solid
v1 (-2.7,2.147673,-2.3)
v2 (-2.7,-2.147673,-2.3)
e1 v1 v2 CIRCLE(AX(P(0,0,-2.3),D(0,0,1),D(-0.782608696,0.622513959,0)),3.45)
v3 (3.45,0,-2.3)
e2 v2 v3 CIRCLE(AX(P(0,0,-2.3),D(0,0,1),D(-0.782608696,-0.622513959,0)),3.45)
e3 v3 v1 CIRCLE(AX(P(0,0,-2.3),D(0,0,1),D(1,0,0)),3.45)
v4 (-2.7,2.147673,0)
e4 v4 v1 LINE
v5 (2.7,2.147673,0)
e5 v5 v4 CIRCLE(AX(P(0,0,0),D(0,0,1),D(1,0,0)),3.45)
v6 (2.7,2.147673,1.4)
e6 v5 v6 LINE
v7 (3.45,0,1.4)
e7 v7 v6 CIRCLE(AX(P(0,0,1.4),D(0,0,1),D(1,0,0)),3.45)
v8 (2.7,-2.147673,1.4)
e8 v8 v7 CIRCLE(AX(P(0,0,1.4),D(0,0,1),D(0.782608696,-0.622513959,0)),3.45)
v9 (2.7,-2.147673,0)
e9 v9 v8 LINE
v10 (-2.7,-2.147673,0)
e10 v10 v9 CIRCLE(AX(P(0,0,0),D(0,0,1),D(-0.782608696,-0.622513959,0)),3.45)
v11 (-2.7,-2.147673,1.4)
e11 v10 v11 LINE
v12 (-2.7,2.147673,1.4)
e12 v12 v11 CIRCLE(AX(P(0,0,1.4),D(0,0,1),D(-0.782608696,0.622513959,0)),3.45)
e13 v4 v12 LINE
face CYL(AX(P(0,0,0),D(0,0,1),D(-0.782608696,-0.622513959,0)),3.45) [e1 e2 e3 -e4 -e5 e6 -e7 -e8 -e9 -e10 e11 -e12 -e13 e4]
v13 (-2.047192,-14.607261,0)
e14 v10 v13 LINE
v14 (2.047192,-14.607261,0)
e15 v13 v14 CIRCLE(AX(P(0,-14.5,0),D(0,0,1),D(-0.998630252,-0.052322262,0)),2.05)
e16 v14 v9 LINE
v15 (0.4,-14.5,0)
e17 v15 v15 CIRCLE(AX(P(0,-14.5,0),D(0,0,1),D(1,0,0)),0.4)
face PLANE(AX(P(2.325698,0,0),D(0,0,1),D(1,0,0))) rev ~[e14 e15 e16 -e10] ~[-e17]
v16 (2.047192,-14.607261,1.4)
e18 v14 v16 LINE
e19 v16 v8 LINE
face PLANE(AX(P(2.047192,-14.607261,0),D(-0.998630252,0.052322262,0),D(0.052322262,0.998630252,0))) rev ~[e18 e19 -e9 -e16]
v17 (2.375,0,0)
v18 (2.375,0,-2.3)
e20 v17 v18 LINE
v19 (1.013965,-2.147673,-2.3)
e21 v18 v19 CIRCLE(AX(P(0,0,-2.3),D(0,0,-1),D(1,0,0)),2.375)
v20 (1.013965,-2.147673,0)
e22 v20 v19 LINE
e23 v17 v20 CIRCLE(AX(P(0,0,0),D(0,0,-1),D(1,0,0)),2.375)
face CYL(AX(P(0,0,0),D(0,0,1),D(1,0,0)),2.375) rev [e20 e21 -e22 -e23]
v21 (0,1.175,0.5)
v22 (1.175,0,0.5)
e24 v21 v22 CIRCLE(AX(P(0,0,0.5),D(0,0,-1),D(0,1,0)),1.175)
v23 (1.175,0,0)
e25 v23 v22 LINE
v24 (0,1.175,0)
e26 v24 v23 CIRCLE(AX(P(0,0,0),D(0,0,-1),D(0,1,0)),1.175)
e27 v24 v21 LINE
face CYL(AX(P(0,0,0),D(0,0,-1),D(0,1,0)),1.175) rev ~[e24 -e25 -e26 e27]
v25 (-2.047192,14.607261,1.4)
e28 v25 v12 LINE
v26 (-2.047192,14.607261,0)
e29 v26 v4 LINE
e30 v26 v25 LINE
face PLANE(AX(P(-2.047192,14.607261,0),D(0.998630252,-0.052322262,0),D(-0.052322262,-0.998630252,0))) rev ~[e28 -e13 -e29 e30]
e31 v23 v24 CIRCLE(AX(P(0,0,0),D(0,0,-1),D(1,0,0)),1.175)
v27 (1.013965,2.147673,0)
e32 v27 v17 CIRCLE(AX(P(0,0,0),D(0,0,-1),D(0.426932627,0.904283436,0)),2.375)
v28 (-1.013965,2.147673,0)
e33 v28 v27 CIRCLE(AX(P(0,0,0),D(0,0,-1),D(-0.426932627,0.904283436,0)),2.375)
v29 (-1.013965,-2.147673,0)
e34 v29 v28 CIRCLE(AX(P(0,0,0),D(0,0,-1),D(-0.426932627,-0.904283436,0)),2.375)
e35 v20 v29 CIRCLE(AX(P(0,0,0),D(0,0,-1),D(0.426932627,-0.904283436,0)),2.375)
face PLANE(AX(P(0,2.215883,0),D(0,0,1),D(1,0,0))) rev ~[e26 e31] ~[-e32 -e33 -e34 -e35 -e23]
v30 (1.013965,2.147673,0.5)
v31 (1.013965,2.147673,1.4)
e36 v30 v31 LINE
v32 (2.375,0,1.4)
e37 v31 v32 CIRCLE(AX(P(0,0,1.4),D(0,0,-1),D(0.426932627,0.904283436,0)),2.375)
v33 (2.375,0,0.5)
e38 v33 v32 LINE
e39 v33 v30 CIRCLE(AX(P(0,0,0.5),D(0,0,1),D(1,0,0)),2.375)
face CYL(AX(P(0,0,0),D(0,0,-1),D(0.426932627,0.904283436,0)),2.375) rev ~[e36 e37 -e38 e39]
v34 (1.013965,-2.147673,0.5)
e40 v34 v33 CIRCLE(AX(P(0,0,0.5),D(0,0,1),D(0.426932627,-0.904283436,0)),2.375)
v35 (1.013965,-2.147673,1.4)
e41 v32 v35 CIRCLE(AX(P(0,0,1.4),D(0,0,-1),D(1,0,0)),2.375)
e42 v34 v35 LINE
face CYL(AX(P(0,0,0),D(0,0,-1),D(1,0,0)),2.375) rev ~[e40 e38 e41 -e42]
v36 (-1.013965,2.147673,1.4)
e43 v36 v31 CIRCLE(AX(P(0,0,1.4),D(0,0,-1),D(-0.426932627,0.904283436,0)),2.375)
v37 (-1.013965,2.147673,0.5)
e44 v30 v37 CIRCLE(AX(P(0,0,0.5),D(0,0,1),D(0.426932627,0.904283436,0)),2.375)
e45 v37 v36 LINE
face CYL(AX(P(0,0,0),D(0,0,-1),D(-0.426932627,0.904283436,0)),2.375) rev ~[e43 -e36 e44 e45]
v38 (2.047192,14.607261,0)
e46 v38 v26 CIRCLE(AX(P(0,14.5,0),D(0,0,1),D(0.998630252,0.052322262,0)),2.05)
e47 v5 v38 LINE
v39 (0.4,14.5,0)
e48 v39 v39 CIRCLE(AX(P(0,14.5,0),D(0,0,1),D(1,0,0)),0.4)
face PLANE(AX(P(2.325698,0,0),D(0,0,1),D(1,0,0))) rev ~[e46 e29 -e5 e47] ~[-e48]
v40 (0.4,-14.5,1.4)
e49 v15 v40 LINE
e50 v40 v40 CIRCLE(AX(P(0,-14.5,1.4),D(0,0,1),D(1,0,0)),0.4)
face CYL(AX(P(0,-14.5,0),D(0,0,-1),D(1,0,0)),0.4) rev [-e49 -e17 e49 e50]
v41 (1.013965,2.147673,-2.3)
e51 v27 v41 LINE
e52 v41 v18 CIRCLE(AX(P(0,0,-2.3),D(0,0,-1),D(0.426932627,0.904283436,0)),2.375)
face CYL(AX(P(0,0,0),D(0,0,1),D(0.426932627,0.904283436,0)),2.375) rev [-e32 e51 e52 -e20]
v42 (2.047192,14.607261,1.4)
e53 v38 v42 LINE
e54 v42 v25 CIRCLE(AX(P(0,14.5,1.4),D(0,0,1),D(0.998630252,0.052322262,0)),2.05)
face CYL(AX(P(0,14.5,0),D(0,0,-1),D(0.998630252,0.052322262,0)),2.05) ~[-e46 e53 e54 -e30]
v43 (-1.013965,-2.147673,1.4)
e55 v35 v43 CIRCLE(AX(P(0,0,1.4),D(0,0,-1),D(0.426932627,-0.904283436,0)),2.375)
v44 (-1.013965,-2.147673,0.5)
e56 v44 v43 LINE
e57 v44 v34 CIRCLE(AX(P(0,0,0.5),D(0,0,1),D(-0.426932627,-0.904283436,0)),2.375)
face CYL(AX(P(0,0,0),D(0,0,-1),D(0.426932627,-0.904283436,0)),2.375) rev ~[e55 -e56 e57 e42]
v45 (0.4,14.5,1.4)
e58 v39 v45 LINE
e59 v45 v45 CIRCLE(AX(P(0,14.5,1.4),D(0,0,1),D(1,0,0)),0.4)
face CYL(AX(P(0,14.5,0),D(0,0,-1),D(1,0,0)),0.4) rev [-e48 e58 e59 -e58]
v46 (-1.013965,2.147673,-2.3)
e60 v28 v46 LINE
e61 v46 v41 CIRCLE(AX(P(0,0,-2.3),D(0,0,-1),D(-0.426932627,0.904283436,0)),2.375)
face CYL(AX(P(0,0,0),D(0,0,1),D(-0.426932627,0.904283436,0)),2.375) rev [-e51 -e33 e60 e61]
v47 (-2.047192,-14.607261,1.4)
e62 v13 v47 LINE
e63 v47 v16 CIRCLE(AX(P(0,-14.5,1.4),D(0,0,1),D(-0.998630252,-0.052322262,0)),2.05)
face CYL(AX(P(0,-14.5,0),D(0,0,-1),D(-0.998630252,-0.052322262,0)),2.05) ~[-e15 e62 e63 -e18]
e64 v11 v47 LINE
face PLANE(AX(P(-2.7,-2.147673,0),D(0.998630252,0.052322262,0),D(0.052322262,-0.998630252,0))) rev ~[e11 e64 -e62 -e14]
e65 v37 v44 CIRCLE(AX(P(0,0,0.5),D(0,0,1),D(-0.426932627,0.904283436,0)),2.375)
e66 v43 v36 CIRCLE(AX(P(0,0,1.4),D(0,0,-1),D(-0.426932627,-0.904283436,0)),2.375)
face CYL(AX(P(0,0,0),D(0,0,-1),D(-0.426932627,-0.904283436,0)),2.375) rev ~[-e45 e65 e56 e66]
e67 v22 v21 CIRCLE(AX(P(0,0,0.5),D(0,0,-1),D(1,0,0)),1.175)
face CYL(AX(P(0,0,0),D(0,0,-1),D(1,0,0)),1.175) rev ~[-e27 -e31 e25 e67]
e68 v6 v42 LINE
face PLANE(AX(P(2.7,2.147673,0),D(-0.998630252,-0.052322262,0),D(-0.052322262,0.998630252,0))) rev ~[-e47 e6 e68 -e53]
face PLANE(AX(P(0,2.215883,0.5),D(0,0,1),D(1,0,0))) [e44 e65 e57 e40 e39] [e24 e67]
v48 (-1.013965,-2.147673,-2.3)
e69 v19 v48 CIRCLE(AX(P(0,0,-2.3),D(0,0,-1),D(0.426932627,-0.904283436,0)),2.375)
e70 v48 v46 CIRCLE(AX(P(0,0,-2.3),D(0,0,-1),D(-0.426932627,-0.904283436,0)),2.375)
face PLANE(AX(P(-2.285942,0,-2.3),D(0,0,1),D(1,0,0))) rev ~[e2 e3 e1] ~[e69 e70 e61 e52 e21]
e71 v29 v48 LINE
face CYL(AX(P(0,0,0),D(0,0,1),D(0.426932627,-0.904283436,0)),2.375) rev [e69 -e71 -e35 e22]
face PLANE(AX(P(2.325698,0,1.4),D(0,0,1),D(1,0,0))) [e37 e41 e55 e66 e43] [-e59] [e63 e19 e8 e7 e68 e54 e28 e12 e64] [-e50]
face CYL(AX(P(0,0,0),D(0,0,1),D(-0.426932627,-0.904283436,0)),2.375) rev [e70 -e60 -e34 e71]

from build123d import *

# Parameters (mm, degrees)
F0_R     = 0.4
F1_DEPTH = 1.4
F2_DEPTH = 2.3
F3_DEPTH = 0.5


with BuildPart() as f1:
    # F0 (on Top) → F1 (new body)
    with BuildSketch(Plane.XY):
        with BuildLine():
            ThreePointArc((2.7, -2.1476731595), (3.2571076126, -1.1374313166), (3.45, 0))
            ThreePointArc((3.45, 0), (3.2571076126, 1.1374313166), (2.7, 2.1476731595))
            Line((2.7, 2.1476731595), (1.0139649895, 2.1476731595))
            ThreePointArc((1.0139649895, 2.1476731595), (2.0060897101, 1.2713099838), (2.375, 0))
            ThreePointArc((2.375, 0), (2.0060897101, -1.2713099838), (1.0139649895, -2.1476731595))
            Line((1.0139649895, -2.1476731595), (2.7, -2.1476731595))
        make_face()
        with BuildLine():
            Line((1.0139649895, 2.1476731595), (2.7, 2.1476731595))
            ThreePointArc((2.7, 2.1476731595), (0, 3.45), (-2.7, 2.1476731595))
            Line((-2.7, 2.1476731595), (-1.0139649895, 2.1476731595))
            ThreePointArc((-1.0139649895, 2.1476731595), (0, 2.375), (1.0139649895, 2.1476731595))
        make_face()
        with BuildLine():
            ThreePointArc((-2.7, 2.1476731595), (0, 3.45), (2.7, 2.1476731595))
            Line((2.7, 2.1476731595), (2.0471920173, 14.6072606371))
            ThreePointArc((2.0471920173, 14.6072606371), (2.0492978841, 14.553648693), (2.05, 14.5))
            ThreePointArc((2.05, 14.5), (-0.053648693, 12.4507021159), (-2.0471920173, 14.6072606371))
            Line((-2.0471920173, 14.6072606371), (-2.7, 2.1476731595))
        make_face()
        with BuildLine():
            Line((2.0471920173, -14.6072606371), (2.7, -2.1476731595))
            ThreePointArc((2.7, -2.1476731595), (0, -3.45), (-2.7, -2.1476731595))
            Line((-2.7, -2.1476731595), (-2.0471920173, -14.6072606371))
            ThreePointArc((-2.0471920173, -14.6072606371), (-0.053648693, -12.4507021159), (2.05, -14.5))
            ThreePointArc((2.05, -14.5), (2.0492978841, -14.553648693), (2.0471920173, -14.6072606371))
        make_face()
        with BuildLine():
            ThreePointArc((-2.7, -2.1476731595), (0, -3.45), (2.7, -2.1476731595))
            Line((2.7, -2.1476731595), (1.0139649895, -2.1476731595))
            ThreePointArc((1.0139649895, -2.1476731595), (0, -2.375), (-1.0139649895, -2.1476731595))
            Line((-1.0139649895, -2.1476731595), (-2.7, -2.1476731595))
        make_face()
        with BuildLine():
            Line((-1.0139649895, 2.1476731595), (-2.7, 2.1476731595))
            ThreePointArc((-2.7, 2.1476731595), (-3.45, 0), (-2.7, -2.1476731595))
            Line((-2.7, -2.1476731595), (-1.0139649895, -2.1476731595))
            ThreePointArc((-1.0139649895, -2.1476731595), (-2.375, 0), (-1.0139649895, 2.1476731595))
        make_face()
        with BuildLine():
            ThreePointArc((2.05, 14.5), (2.0492978841, 14.553648693), (2.0471920173, 14.6072606371))
            ThreePointArc((2.0471920173, 14.6072606371), (0, 16.55), (-2.0471920173, 14.6072606371))
            ThreePointArc((-2.0471920173, 14.6072606371), (-0.053648693, 12.4507021159), (2.05, 14.5))
        make_face()
        with Locations((0, 14.5)):
            Circle(F0_R, mode=Mode.SUBTRACT)
        with BuildLine():
            ThreePointArc((-2.0471920173, -14.6072606371), (0, -16.55), (2.0471920173, -14.6072606371))
            ThreePointArc((2.0471920173, -14.6072606371), (2.0492978841, -14.553648693), (2.05, -14.5))
            ThreePointArc((2.05, -14.5), (-0.053648693, -12.4507021159), (-2.0471920173, -14.6072606371))
        make_face()
        with Locations((0, -14.5)):
            Circle(F0_R, mode=Mode.SUBTRACT)
    extrude(amount=F1_DEPTH)

    # F0 (on Top) → F2 (join)
    with BuildSketch(Plane.XY):
        with BuildLine():
            Line((-1.0139649895, 2.1476731595), (-2.7, 2.1476731595))
            ThreePointArc((-2.7, 2.1476731595), (-3.45, 0), (-2.7, -2.1476731595))
            Line((-2.7, -2.1476731595), (-1.0139649895, -2.1476731595))
            ThreePointArc((-1.0139649895, -2.1476731595), (-2.375, 0), (-1.0139649895, 2.1476731595))
        make_face()
        with BuildLine():
            Line((1.0139649895, 2.1476731595), (2.7, 2.1476731595))
            ThreePointArc((2.7, 2.1476731595), (0, 3.45), (-2.7, 2.1476731595))
            Line((-2.7, 2.1476731595), (-1.0139649895, 2.1476731595))
            ThreePointArc((-1.0139649895, 2.1476731595), (0, 2.375), (1.0139649895, 2.1476731595))
        make_face()
        with BuildLine():
            ThreePointArc((-2.7, -2.1476731595), (0, -3.45), (2.7, -2.1476731595))
            Line((2.7, -2.1476731595), (1.0139649895, -2.1476731595))
            ThreePointArc((1.0139649895, -2.1476731595), (0, -2.375), (-1.0139649895, -2.1476731595))
            Line((-1.0139649895, -2.1476731595), (-2.7, -2.1476731595))
        make_face()
        with BuildLine():
            ThreePointArc((2.7, -2.1476731595), (3.2571076126, -1.1374313166), (3.45, 0))
            ThreePointArc((3.45, 0), (3.2571076126, 1.1374313166), (2.7, 2.1476731595))
            Line((2.7, 2.1476731595), (1.0139649895, 2.1476731595))
            ThreePointArc((1.0139649895, 2.1476731595), (2.0060897101, 1.2713099838), (2.375, 0))
            ThreePointArc((2.375, 0), (2.0060897101, -1.2713099838), (1.0139649895, -2.1476731595))
            Line((1.0139649895, -2.1476731595), (2.7, -2.1476731595))
        make_face()
    extrude(amount=-F2_DEPTH)

    # F0 (on Top) → F3 (join)
    with BuildSketch(Plane.XY):
        with BuildLine():
            Line((0, 2.1476731595), (1.0139649895, 2.1476731595))
            ThreePointArc((1.0139649895, 2.1476731595), (0, 2.375), (-1.0139649895, 2.1476731595))
            Line((-1.0139649895, 2.1476731595), (0, 2.1476731595))
        make_face()
        with BuildLine():
            ThreePointArc((2.375, 0), (2.0060897101, 1.2713099838), (1.0139649895, 2.1476731595))
            Line((1.0139649895, 2.1476731595), (0, 2.1476731595))
            Line((0, 2.1476731595), (-1.0139649895, 2.1476731595))
            ThreePointArc((-1.0139649895, 2.1476731595), (-2.375, 0), (-1.0139649895, -2.1476731595))
            Line((-1.0139649895, -2.1476731595), (1.0139649895, -2.1476731595))
            ThreePointArc((1.0139649895, -2.1476731595), (2.0060897101, -1.2713099838), (2.375, 0))
        make_face()
        with BuildLine():
            ThreePointArc((1.175, 0), (-0.8308504679, -0.8308504679), (0, 1.175))
            ThreePointArc((0, 1.175), (0.8308504679, 0.8308504679), (1.175, 0))
        make_face(mode=Mode.SUBTRACT)
        with BuildLine():
            ThreePointArc((-1.0139649895, -2.1476731595), (0, -2.375), (1.0139649895, -2.1476731595))
            Line((1.0139649895, -2.1476731595), (-1.0139649895, -2.1476731595))
        make_face()
    extrude(amount=F3_DEPTH)


solid = f1.part
